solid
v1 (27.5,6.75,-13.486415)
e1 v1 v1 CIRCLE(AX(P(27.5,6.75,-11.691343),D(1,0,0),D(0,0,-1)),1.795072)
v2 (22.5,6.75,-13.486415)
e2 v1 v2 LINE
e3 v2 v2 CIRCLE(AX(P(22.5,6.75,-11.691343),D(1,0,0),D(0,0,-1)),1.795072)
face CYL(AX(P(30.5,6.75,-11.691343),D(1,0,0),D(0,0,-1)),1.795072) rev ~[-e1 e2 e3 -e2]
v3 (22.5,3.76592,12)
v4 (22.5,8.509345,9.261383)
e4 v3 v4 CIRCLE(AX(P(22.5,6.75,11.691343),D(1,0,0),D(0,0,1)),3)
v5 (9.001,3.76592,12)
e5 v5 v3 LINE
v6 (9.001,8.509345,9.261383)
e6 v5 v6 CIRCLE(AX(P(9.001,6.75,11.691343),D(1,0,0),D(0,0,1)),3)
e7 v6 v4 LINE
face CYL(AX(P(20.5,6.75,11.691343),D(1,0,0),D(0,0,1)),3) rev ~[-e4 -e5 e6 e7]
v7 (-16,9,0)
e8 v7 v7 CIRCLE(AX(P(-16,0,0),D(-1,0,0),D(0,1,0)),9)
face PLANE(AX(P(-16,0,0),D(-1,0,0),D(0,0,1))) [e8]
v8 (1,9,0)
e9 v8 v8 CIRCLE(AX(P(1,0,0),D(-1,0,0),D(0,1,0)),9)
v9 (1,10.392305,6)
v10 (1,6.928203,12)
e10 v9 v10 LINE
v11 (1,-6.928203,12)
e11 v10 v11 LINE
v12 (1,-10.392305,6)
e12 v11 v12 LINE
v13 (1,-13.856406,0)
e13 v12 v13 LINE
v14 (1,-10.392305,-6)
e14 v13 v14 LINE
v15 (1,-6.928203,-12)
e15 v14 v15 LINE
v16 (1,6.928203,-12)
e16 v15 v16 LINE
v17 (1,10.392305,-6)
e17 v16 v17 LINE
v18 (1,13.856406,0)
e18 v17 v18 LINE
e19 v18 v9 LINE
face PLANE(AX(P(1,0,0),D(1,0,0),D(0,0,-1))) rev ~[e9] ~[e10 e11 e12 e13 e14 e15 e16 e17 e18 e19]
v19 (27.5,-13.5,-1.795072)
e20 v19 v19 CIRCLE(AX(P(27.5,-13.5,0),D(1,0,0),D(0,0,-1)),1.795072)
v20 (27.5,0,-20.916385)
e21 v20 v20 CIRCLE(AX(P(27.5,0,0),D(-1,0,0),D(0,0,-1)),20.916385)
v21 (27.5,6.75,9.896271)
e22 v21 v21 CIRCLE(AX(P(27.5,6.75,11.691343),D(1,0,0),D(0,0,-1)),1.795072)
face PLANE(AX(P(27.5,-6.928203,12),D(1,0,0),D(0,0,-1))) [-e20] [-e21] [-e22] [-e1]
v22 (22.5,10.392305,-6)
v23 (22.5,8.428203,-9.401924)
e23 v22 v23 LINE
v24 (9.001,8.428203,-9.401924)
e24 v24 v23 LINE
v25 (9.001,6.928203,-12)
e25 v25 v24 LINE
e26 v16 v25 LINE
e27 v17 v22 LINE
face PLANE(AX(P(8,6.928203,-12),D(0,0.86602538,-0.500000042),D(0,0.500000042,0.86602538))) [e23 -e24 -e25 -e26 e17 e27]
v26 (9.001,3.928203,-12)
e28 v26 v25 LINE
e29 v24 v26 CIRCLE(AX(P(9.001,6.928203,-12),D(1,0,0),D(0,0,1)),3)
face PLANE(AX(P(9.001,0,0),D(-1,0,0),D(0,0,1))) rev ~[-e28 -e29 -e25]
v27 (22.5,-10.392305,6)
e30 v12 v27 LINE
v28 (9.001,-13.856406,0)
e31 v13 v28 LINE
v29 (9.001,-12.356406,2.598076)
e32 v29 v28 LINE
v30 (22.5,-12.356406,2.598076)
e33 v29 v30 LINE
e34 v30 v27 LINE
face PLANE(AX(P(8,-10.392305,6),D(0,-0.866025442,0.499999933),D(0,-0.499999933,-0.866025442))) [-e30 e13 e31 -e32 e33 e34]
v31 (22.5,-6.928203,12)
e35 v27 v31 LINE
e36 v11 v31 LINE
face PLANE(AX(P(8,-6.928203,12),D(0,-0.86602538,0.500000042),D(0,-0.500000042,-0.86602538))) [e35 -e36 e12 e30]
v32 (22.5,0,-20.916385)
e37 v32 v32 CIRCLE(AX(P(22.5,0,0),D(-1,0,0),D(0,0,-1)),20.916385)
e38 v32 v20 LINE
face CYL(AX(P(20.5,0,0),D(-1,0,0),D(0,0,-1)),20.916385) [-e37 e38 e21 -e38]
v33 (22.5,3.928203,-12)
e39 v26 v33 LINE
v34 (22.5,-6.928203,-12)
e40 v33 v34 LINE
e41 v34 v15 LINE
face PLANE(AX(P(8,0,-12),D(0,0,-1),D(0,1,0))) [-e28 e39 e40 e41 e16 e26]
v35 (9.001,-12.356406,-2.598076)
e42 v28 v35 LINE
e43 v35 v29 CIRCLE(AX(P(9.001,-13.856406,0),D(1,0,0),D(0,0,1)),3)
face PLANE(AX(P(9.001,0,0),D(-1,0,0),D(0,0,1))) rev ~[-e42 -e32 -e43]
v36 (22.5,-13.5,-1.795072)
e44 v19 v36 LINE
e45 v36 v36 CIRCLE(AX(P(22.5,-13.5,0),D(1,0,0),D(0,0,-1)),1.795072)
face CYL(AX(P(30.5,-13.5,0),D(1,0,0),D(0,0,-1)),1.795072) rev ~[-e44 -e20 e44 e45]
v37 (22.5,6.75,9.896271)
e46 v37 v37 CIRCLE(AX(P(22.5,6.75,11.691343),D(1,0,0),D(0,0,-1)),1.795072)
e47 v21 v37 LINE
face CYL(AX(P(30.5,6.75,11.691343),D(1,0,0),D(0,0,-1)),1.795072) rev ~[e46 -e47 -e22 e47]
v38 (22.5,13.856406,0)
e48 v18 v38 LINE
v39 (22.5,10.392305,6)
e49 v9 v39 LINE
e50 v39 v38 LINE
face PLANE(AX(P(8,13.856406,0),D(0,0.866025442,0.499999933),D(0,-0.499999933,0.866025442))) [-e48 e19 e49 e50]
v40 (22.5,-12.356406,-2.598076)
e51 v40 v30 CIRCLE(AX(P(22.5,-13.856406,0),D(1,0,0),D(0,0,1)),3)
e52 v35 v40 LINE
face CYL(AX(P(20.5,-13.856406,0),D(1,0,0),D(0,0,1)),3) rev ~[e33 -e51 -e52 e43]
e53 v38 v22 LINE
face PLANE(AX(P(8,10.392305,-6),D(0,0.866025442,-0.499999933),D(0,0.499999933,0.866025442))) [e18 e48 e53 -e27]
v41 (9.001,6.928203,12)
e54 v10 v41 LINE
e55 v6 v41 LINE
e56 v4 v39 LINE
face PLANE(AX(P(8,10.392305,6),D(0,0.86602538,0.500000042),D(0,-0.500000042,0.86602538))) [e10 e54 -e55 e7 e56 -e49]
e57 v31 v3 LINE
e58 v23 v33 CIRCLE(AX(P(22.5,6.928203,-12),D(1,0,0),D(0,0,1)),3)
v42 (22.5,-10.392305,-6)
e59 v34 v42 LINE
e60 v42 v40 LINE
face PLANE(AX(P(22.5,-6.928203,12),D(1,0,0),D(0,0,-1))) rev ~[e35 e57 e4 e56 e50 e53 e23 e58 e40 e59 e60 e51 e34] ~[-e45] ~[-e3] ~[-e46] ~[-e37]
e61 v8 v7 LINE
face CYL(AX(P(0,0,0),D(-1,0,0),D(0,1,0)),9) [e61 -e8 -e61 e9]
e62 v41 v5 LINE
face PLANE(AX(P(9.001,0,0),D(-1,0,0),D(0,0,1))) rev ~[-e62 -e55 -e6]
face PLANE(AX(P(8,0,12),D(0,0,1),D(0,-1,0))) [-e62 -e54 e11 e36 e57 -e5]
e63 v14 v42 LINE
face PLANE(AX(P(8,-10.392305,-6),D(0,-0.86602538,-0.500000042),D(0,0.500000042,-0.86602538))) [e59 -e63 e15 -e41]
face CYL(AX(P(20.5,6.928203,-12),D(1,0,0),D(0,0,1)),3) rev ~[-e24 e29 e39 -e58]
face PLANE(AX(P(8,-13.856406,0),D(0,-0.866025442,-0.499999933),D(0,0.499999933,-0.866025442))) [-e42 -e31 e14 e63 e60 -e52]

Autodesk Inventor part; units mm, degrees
ref_plane "YZ Plane" through (0, 0, 0) normal (1, 0, 0) x (0, 1, 0)
ref_plane "XZ Plane" through (0, 0, 0) normal (0, 1, 0) x (-1, 0, 0)
ref_plane "XY Plane" through (0, 0, 0) normal (0, 0, 1) x (1, 0, 0)
sketch "Sketch1" plane through (0, 0, 0) normal (0, 0, 1) x (1, 0, 0)
  line L0 (0, 0) -> (-13, 0)
  line L1 (-13, 0) -> (-13, 9)
  line L2 (-13, 9) -> (0, 9)
  line L3 (0, 9) -> (0, 12)
  line L4 (0, 12) -> (8, 12)
  line L5 (8, 12) -> (8, 11)
  line L6 (33, 0) -> (0, 0)
  line L7 (8, 11) -> (8, 0)
  dimension "d0" = 13
  dimension "d1" = 9
  dimension "d2" = 13
  dimension "d3" = 3
  dimension "d4" = 8
  dimension "d5" = 1
sketch "Sketch1 outline for Revolution1" plane through (0, 0, 0) normal (0, 0, 1) x (1, 0, 0)
  line L0 (8, 11) -> (8, 12)
  line L1 (8, 0) -> (8, 11)
  line L2 (0, 0) -> (8, 0)
  line L3 (-13, 0) -> (0, 0)
  line L4 (-13, 9) -> (-13, 0)
  line L5 (0, 9) -> (-13, 9)
  line L6 (0, 12) -> (0, 9)
  line L7 (8, 12) -> (0, 12)
revolve "Revolution1" add sketch "Sketch1 outline for Revolution1" angle 360 about axis through (33, 0, 0) along (-1, 0, 0)
sketch "Sketch2" plane through (8, 0, 0) normal (1, 0, 0) x (0, 0, -1)
  circle A0 centre (0, 0) radius 12
  line L0 (12, -6.928203) -> (0, -13.856406)
  line L1 (0, -13.856406) -> (-12, -6.928203)
  line L2 (-12, -6.928203) -> (-12, 6.928203)
  line L3 (-12, 6.928203) -> (0, 13.856406)
  line L4 (0, 13.856406) -> (12, 6.928203)
  line L5 (12, 6.928203) -> (12, -6.928203)
  circle A1 centre (0, 0) radius 11
  point P0 (0, 0)
  point P1 (12, 0)
  point P2 (6, 10.392305)
  point P3 (6, -10.392305)
  point P4 (-6, 10.392305)
  point P5 (-12, 0)
  point P6 (-6, -10.392305)
  dimension "d12" = 24
  dimension "d13" = 0
sketch "Sketch2 outline for Extrusion1" plane through (8, 0, 0) normal (1, 0, 0) x (0, 0, -1)
  line L0 (12, 0) -> (12, 6.928203)
  arc A0 (6, 10.392305) -> (12, 0) centre (0, 0) cw
  line L1 (12, 6.928203) -> (6, 10.392305)
  line L2 (12, -6.928203) -> (12, 0)
  line L3 (6, -10.392305) -> (12, -6.928203)
  arc A1 (12, 0) -> (6, -10.392305) centre (0, 0) cw
  line L4 (6, 10.392305) -> (0, 13.856406)
  arc A2 (-6, 10.392305) -> (6, 10.392305) centre (0, 0) cw
  line L5 (0, 13.856406) -> (-6, 10.392305)
  line L6 (-6, 10.392305) -> (-12, 6.928203)
  arc A3 (-12, 0) -> (-6, 10.392305) centre (0, 0) cw
  line L7 (-12, 6.928203) -> (-12, 0)
  line L8 (-12, 0) -> (-12, -6.928203)
  arc A4 (-6, -10.392305) -> (-12, 0) centre (0, 0) cw
  line L9 (-12, -6.928203) -> (-6, -10.392305)
  line L10 (-6, -10.392305) -> (0, -13.856406)
  arc A5 (6, -10.392305) -> (-6, -10.392305) centre (0, 0) cw
  line L11 (0, -13.856406) -> (6, -10.392305)
extrude "Extrusion1" add sketch "Sketch2 outline for Extrusion1" against normal blind 8 contours A0 L1 L0 | L2 L3 A1 | A2 L5 L4 | L11 L10 A5 | A3 L7 L6 | L9 L8 A4
sketch "Sketch3" plane through (-13, 0, 0) normal (-1, 0, 0) x (0, 0, 1)
  circle A0 centre (0, 0) radius 7.75 projected
  circle A1 centre (0, 0) radius 6.5
  point P0 (0, 0)
  dimension "d18" = 13
sketch "Sketch3 outline for Extrusion2" plane through (-13, 0, 0) normal (-1, 0, 0) x (0, 0, 1)
  circle A0 centre (0, 0) radius 6.5
extrude "Extrusion2" cut sketch "Sketch3 outline for Extrusion2" against normal blind 13
sketch "Sketch4" plane through (0, 0, 0) normal (-1, 0, 0) x (0, 0, 1)
  circle A0 centre (0, 0) radius 1.55
  point P0 (0, 0)
  dimension "d21" = 3.1
sketch "Sketch4 outline for Extrusion3" plane through (0, 0, 0) normal (-1, 0, 0) x (0, 0, 1)
  circle A0 centre (0, 0) radius 1.55
extrude "Extrusion3" cut sketch "Sketch4 outline for Extrusion3" against normal through all
ref_plane "작업 평면2" through (20.5, 0, -6) normal (0, 0, 1) x (1, 0, 0)
sketch "스케치7" plane through (20.5, 0, -6) normal (0, 0, 1) x (1, 0, 0)
  circle A0 centre (6.75, 0) radius 1.3
  line L0 (6.75, -3.175426) -> (4, -1.587713)
  line L1 (4, -1.587713) -> (4, 1.587713)
  line L2 (4, 1.587713) -> (6.75, 3.175426)
  line L3 (6.75, 3.175426) -> (9.5, 1.587713)
  line L4 (9.5, 1.587713) -> (9.5, -1.587713)
  line L5 (9.5, -1.587713) -> (6.75, -3.175426)
  line L6 (12.5, 6) -> (12.5, -6)
  point P0 (-20.5, 0)
  point P1 (9.5, 0)
  dimension "d27" = 2.6
  dimension "d28" = 5.5
  dimension "d37" = 3
extrude "돌출6" [suppressed]
extrude "돌출7" [suppressed]
sketch "스케치8" plane through (33, 0, 0) normal (1, 0, 0) x (0, 0, -1)
  point P0 (0, 0)
sketch "스케치9" plane through (8, -6.928203, 12) normal (1, 0, 0) x (0, 0, -1)
  circle A0 centre (12, 6.928203) radius 16
  dimension "d38" = 32
extrude "돌출8" [suppressed]
move faces "이동1" translate (12.5, 0, 10) faces at (8, 7.353412, -4.2935)
sketch "스케치10" plane through (20.5, -6.928203, 12) normal (1, 0, 0) x (0, 0, -1)
  circle A0 centre (12, 6.928203) radius 1.55
  circle A1 centre (12, 6.928203) radius 25
  dimension "d44" = 50
extrude "돌출9" [suppressed]
sketch "스케치11" plane through (20.5, 0, 0) normal (-1, 0, 0) x (0, 0, 1)
  circle A0 centre (0, 0) radius 1.55 projected
  circle A1 centre (0, 0) radius 15
  circle A2 centre (0, 0) radius 16
  point P0 (0, 0)
  dimension "d49" = 30
  dimension "d50" = 32
extrude "돌출10" [suppressed]
sketch "스케치12" plane through (20.5, -6.928203, 12) normal (1, 0, 0) x (0, 0, -1)
  circle A0 centre (12, 6.928203) radius 20.916385
sketch "스케치12 outline for 돌출11" plane through (20.5, -6.928203, 12) normal (1, 0, 0) x (0, 0, -1)
  circle A0 centre (12, 6.928203) radius 20.916385
extrude "돌출11" add sketch "스케치12 outline for 돌출11" along normal blind 10
sketch "스케치14" plane through (30.5, 0, 0) normal (1, 0, 0) x (0, 0, -1)
  circle A0 centre (0, 0) radius 13.5
  circle A1 centre (0, -13.5) radius 1.795072
  circle A2 centre (11.691343, 6.75) radius 1.795072
  circle A3 centre (-11.691343, 6.75) radius 1.795072
  dimension "d59" = 27
  dimension "d64" = 360
sketch "스케치14 outline for 돌출13" plane through (30.5, 0, 0) normal (1, 0, 0) x (0, 0, -1)
  circle A0 centre (0, -13.5) radius 1.795072
  circle A1 centre (11.691343, 6.75) radius 1.795072
  circle A2 centre (-11.691343, 6.75) radius 1.795072
extrude "돌출13" cut sketch "스케치14 outline for 돌출13" against normal blind 15
sketch "스케치15" plane through (30.5, 0, 0) normal (1, 0, 0) x (0, 0, -1)
  point P0 (0, 0)
sketch "스케치16" plane through (20.5, 0, 0) normal (-1, 0, 0) x (0, 0, 1)
  circle A0 centre (0, -13.856406) radius 3
  circle A1 centre (11.691343, 6.75) radius 1.795072
  circle A2 centre (11.691343, 6.75) radius 3
  circle A3 centre (-12, 6.928203) radius 3
  point P0 (0, 0)
  dimension "d66" = 6
  dimension "d67" = 6
  dimension "d68" = 6
sketch "스케치16 outline for 돌출14" plane through (20.5, 0, 0) normal (-1, 0, 0) x (0, 0, 1)
  circle A0 centre (11.691343, 6.75) radius 3
  circle A1 centre (-12, 6.928203) radius 3
  circle A2 centre (0, -13.856406) radius 3
extrude "돌출14" cut sketch "스케치16 outline for 돌출14" along normal blind 11.499
move faces "이동2" translate (-3, 0, 0) faces at (30.5, 0.037854, 0.072124)
move faces "이동3" translate (9, 0, 0) faces at (0, 0.36161, -10.978127)
move faces "이동4" translate (5, 0, 0) faces at (-13, 8.063695, 0.97911)
move faces "이동5" translate (-8, 0, 0) faces at (9, -0.36161, -10.978127)
move faces "이동6" translate (-25.75, 0, 0) faces at (13.666667, -0.124723, 1.544974)
move faces "이동7" translate (-8, 0, 0) faces at (-8, 8.063695, 0.97911)
move faces "이동8" translate (-36.5, 0, 0) faces at (20.5, -0.007186, -0.457486)
move faces "이동9" translate (-16, 0, 0) faces at (0, -0.518517, 4.787041)
move faces "이동10" translate (2, 0, 0) faces at (20.5, -1, -14.972128)
properties part number "HEX HUB_Version2 (cheeta)"
